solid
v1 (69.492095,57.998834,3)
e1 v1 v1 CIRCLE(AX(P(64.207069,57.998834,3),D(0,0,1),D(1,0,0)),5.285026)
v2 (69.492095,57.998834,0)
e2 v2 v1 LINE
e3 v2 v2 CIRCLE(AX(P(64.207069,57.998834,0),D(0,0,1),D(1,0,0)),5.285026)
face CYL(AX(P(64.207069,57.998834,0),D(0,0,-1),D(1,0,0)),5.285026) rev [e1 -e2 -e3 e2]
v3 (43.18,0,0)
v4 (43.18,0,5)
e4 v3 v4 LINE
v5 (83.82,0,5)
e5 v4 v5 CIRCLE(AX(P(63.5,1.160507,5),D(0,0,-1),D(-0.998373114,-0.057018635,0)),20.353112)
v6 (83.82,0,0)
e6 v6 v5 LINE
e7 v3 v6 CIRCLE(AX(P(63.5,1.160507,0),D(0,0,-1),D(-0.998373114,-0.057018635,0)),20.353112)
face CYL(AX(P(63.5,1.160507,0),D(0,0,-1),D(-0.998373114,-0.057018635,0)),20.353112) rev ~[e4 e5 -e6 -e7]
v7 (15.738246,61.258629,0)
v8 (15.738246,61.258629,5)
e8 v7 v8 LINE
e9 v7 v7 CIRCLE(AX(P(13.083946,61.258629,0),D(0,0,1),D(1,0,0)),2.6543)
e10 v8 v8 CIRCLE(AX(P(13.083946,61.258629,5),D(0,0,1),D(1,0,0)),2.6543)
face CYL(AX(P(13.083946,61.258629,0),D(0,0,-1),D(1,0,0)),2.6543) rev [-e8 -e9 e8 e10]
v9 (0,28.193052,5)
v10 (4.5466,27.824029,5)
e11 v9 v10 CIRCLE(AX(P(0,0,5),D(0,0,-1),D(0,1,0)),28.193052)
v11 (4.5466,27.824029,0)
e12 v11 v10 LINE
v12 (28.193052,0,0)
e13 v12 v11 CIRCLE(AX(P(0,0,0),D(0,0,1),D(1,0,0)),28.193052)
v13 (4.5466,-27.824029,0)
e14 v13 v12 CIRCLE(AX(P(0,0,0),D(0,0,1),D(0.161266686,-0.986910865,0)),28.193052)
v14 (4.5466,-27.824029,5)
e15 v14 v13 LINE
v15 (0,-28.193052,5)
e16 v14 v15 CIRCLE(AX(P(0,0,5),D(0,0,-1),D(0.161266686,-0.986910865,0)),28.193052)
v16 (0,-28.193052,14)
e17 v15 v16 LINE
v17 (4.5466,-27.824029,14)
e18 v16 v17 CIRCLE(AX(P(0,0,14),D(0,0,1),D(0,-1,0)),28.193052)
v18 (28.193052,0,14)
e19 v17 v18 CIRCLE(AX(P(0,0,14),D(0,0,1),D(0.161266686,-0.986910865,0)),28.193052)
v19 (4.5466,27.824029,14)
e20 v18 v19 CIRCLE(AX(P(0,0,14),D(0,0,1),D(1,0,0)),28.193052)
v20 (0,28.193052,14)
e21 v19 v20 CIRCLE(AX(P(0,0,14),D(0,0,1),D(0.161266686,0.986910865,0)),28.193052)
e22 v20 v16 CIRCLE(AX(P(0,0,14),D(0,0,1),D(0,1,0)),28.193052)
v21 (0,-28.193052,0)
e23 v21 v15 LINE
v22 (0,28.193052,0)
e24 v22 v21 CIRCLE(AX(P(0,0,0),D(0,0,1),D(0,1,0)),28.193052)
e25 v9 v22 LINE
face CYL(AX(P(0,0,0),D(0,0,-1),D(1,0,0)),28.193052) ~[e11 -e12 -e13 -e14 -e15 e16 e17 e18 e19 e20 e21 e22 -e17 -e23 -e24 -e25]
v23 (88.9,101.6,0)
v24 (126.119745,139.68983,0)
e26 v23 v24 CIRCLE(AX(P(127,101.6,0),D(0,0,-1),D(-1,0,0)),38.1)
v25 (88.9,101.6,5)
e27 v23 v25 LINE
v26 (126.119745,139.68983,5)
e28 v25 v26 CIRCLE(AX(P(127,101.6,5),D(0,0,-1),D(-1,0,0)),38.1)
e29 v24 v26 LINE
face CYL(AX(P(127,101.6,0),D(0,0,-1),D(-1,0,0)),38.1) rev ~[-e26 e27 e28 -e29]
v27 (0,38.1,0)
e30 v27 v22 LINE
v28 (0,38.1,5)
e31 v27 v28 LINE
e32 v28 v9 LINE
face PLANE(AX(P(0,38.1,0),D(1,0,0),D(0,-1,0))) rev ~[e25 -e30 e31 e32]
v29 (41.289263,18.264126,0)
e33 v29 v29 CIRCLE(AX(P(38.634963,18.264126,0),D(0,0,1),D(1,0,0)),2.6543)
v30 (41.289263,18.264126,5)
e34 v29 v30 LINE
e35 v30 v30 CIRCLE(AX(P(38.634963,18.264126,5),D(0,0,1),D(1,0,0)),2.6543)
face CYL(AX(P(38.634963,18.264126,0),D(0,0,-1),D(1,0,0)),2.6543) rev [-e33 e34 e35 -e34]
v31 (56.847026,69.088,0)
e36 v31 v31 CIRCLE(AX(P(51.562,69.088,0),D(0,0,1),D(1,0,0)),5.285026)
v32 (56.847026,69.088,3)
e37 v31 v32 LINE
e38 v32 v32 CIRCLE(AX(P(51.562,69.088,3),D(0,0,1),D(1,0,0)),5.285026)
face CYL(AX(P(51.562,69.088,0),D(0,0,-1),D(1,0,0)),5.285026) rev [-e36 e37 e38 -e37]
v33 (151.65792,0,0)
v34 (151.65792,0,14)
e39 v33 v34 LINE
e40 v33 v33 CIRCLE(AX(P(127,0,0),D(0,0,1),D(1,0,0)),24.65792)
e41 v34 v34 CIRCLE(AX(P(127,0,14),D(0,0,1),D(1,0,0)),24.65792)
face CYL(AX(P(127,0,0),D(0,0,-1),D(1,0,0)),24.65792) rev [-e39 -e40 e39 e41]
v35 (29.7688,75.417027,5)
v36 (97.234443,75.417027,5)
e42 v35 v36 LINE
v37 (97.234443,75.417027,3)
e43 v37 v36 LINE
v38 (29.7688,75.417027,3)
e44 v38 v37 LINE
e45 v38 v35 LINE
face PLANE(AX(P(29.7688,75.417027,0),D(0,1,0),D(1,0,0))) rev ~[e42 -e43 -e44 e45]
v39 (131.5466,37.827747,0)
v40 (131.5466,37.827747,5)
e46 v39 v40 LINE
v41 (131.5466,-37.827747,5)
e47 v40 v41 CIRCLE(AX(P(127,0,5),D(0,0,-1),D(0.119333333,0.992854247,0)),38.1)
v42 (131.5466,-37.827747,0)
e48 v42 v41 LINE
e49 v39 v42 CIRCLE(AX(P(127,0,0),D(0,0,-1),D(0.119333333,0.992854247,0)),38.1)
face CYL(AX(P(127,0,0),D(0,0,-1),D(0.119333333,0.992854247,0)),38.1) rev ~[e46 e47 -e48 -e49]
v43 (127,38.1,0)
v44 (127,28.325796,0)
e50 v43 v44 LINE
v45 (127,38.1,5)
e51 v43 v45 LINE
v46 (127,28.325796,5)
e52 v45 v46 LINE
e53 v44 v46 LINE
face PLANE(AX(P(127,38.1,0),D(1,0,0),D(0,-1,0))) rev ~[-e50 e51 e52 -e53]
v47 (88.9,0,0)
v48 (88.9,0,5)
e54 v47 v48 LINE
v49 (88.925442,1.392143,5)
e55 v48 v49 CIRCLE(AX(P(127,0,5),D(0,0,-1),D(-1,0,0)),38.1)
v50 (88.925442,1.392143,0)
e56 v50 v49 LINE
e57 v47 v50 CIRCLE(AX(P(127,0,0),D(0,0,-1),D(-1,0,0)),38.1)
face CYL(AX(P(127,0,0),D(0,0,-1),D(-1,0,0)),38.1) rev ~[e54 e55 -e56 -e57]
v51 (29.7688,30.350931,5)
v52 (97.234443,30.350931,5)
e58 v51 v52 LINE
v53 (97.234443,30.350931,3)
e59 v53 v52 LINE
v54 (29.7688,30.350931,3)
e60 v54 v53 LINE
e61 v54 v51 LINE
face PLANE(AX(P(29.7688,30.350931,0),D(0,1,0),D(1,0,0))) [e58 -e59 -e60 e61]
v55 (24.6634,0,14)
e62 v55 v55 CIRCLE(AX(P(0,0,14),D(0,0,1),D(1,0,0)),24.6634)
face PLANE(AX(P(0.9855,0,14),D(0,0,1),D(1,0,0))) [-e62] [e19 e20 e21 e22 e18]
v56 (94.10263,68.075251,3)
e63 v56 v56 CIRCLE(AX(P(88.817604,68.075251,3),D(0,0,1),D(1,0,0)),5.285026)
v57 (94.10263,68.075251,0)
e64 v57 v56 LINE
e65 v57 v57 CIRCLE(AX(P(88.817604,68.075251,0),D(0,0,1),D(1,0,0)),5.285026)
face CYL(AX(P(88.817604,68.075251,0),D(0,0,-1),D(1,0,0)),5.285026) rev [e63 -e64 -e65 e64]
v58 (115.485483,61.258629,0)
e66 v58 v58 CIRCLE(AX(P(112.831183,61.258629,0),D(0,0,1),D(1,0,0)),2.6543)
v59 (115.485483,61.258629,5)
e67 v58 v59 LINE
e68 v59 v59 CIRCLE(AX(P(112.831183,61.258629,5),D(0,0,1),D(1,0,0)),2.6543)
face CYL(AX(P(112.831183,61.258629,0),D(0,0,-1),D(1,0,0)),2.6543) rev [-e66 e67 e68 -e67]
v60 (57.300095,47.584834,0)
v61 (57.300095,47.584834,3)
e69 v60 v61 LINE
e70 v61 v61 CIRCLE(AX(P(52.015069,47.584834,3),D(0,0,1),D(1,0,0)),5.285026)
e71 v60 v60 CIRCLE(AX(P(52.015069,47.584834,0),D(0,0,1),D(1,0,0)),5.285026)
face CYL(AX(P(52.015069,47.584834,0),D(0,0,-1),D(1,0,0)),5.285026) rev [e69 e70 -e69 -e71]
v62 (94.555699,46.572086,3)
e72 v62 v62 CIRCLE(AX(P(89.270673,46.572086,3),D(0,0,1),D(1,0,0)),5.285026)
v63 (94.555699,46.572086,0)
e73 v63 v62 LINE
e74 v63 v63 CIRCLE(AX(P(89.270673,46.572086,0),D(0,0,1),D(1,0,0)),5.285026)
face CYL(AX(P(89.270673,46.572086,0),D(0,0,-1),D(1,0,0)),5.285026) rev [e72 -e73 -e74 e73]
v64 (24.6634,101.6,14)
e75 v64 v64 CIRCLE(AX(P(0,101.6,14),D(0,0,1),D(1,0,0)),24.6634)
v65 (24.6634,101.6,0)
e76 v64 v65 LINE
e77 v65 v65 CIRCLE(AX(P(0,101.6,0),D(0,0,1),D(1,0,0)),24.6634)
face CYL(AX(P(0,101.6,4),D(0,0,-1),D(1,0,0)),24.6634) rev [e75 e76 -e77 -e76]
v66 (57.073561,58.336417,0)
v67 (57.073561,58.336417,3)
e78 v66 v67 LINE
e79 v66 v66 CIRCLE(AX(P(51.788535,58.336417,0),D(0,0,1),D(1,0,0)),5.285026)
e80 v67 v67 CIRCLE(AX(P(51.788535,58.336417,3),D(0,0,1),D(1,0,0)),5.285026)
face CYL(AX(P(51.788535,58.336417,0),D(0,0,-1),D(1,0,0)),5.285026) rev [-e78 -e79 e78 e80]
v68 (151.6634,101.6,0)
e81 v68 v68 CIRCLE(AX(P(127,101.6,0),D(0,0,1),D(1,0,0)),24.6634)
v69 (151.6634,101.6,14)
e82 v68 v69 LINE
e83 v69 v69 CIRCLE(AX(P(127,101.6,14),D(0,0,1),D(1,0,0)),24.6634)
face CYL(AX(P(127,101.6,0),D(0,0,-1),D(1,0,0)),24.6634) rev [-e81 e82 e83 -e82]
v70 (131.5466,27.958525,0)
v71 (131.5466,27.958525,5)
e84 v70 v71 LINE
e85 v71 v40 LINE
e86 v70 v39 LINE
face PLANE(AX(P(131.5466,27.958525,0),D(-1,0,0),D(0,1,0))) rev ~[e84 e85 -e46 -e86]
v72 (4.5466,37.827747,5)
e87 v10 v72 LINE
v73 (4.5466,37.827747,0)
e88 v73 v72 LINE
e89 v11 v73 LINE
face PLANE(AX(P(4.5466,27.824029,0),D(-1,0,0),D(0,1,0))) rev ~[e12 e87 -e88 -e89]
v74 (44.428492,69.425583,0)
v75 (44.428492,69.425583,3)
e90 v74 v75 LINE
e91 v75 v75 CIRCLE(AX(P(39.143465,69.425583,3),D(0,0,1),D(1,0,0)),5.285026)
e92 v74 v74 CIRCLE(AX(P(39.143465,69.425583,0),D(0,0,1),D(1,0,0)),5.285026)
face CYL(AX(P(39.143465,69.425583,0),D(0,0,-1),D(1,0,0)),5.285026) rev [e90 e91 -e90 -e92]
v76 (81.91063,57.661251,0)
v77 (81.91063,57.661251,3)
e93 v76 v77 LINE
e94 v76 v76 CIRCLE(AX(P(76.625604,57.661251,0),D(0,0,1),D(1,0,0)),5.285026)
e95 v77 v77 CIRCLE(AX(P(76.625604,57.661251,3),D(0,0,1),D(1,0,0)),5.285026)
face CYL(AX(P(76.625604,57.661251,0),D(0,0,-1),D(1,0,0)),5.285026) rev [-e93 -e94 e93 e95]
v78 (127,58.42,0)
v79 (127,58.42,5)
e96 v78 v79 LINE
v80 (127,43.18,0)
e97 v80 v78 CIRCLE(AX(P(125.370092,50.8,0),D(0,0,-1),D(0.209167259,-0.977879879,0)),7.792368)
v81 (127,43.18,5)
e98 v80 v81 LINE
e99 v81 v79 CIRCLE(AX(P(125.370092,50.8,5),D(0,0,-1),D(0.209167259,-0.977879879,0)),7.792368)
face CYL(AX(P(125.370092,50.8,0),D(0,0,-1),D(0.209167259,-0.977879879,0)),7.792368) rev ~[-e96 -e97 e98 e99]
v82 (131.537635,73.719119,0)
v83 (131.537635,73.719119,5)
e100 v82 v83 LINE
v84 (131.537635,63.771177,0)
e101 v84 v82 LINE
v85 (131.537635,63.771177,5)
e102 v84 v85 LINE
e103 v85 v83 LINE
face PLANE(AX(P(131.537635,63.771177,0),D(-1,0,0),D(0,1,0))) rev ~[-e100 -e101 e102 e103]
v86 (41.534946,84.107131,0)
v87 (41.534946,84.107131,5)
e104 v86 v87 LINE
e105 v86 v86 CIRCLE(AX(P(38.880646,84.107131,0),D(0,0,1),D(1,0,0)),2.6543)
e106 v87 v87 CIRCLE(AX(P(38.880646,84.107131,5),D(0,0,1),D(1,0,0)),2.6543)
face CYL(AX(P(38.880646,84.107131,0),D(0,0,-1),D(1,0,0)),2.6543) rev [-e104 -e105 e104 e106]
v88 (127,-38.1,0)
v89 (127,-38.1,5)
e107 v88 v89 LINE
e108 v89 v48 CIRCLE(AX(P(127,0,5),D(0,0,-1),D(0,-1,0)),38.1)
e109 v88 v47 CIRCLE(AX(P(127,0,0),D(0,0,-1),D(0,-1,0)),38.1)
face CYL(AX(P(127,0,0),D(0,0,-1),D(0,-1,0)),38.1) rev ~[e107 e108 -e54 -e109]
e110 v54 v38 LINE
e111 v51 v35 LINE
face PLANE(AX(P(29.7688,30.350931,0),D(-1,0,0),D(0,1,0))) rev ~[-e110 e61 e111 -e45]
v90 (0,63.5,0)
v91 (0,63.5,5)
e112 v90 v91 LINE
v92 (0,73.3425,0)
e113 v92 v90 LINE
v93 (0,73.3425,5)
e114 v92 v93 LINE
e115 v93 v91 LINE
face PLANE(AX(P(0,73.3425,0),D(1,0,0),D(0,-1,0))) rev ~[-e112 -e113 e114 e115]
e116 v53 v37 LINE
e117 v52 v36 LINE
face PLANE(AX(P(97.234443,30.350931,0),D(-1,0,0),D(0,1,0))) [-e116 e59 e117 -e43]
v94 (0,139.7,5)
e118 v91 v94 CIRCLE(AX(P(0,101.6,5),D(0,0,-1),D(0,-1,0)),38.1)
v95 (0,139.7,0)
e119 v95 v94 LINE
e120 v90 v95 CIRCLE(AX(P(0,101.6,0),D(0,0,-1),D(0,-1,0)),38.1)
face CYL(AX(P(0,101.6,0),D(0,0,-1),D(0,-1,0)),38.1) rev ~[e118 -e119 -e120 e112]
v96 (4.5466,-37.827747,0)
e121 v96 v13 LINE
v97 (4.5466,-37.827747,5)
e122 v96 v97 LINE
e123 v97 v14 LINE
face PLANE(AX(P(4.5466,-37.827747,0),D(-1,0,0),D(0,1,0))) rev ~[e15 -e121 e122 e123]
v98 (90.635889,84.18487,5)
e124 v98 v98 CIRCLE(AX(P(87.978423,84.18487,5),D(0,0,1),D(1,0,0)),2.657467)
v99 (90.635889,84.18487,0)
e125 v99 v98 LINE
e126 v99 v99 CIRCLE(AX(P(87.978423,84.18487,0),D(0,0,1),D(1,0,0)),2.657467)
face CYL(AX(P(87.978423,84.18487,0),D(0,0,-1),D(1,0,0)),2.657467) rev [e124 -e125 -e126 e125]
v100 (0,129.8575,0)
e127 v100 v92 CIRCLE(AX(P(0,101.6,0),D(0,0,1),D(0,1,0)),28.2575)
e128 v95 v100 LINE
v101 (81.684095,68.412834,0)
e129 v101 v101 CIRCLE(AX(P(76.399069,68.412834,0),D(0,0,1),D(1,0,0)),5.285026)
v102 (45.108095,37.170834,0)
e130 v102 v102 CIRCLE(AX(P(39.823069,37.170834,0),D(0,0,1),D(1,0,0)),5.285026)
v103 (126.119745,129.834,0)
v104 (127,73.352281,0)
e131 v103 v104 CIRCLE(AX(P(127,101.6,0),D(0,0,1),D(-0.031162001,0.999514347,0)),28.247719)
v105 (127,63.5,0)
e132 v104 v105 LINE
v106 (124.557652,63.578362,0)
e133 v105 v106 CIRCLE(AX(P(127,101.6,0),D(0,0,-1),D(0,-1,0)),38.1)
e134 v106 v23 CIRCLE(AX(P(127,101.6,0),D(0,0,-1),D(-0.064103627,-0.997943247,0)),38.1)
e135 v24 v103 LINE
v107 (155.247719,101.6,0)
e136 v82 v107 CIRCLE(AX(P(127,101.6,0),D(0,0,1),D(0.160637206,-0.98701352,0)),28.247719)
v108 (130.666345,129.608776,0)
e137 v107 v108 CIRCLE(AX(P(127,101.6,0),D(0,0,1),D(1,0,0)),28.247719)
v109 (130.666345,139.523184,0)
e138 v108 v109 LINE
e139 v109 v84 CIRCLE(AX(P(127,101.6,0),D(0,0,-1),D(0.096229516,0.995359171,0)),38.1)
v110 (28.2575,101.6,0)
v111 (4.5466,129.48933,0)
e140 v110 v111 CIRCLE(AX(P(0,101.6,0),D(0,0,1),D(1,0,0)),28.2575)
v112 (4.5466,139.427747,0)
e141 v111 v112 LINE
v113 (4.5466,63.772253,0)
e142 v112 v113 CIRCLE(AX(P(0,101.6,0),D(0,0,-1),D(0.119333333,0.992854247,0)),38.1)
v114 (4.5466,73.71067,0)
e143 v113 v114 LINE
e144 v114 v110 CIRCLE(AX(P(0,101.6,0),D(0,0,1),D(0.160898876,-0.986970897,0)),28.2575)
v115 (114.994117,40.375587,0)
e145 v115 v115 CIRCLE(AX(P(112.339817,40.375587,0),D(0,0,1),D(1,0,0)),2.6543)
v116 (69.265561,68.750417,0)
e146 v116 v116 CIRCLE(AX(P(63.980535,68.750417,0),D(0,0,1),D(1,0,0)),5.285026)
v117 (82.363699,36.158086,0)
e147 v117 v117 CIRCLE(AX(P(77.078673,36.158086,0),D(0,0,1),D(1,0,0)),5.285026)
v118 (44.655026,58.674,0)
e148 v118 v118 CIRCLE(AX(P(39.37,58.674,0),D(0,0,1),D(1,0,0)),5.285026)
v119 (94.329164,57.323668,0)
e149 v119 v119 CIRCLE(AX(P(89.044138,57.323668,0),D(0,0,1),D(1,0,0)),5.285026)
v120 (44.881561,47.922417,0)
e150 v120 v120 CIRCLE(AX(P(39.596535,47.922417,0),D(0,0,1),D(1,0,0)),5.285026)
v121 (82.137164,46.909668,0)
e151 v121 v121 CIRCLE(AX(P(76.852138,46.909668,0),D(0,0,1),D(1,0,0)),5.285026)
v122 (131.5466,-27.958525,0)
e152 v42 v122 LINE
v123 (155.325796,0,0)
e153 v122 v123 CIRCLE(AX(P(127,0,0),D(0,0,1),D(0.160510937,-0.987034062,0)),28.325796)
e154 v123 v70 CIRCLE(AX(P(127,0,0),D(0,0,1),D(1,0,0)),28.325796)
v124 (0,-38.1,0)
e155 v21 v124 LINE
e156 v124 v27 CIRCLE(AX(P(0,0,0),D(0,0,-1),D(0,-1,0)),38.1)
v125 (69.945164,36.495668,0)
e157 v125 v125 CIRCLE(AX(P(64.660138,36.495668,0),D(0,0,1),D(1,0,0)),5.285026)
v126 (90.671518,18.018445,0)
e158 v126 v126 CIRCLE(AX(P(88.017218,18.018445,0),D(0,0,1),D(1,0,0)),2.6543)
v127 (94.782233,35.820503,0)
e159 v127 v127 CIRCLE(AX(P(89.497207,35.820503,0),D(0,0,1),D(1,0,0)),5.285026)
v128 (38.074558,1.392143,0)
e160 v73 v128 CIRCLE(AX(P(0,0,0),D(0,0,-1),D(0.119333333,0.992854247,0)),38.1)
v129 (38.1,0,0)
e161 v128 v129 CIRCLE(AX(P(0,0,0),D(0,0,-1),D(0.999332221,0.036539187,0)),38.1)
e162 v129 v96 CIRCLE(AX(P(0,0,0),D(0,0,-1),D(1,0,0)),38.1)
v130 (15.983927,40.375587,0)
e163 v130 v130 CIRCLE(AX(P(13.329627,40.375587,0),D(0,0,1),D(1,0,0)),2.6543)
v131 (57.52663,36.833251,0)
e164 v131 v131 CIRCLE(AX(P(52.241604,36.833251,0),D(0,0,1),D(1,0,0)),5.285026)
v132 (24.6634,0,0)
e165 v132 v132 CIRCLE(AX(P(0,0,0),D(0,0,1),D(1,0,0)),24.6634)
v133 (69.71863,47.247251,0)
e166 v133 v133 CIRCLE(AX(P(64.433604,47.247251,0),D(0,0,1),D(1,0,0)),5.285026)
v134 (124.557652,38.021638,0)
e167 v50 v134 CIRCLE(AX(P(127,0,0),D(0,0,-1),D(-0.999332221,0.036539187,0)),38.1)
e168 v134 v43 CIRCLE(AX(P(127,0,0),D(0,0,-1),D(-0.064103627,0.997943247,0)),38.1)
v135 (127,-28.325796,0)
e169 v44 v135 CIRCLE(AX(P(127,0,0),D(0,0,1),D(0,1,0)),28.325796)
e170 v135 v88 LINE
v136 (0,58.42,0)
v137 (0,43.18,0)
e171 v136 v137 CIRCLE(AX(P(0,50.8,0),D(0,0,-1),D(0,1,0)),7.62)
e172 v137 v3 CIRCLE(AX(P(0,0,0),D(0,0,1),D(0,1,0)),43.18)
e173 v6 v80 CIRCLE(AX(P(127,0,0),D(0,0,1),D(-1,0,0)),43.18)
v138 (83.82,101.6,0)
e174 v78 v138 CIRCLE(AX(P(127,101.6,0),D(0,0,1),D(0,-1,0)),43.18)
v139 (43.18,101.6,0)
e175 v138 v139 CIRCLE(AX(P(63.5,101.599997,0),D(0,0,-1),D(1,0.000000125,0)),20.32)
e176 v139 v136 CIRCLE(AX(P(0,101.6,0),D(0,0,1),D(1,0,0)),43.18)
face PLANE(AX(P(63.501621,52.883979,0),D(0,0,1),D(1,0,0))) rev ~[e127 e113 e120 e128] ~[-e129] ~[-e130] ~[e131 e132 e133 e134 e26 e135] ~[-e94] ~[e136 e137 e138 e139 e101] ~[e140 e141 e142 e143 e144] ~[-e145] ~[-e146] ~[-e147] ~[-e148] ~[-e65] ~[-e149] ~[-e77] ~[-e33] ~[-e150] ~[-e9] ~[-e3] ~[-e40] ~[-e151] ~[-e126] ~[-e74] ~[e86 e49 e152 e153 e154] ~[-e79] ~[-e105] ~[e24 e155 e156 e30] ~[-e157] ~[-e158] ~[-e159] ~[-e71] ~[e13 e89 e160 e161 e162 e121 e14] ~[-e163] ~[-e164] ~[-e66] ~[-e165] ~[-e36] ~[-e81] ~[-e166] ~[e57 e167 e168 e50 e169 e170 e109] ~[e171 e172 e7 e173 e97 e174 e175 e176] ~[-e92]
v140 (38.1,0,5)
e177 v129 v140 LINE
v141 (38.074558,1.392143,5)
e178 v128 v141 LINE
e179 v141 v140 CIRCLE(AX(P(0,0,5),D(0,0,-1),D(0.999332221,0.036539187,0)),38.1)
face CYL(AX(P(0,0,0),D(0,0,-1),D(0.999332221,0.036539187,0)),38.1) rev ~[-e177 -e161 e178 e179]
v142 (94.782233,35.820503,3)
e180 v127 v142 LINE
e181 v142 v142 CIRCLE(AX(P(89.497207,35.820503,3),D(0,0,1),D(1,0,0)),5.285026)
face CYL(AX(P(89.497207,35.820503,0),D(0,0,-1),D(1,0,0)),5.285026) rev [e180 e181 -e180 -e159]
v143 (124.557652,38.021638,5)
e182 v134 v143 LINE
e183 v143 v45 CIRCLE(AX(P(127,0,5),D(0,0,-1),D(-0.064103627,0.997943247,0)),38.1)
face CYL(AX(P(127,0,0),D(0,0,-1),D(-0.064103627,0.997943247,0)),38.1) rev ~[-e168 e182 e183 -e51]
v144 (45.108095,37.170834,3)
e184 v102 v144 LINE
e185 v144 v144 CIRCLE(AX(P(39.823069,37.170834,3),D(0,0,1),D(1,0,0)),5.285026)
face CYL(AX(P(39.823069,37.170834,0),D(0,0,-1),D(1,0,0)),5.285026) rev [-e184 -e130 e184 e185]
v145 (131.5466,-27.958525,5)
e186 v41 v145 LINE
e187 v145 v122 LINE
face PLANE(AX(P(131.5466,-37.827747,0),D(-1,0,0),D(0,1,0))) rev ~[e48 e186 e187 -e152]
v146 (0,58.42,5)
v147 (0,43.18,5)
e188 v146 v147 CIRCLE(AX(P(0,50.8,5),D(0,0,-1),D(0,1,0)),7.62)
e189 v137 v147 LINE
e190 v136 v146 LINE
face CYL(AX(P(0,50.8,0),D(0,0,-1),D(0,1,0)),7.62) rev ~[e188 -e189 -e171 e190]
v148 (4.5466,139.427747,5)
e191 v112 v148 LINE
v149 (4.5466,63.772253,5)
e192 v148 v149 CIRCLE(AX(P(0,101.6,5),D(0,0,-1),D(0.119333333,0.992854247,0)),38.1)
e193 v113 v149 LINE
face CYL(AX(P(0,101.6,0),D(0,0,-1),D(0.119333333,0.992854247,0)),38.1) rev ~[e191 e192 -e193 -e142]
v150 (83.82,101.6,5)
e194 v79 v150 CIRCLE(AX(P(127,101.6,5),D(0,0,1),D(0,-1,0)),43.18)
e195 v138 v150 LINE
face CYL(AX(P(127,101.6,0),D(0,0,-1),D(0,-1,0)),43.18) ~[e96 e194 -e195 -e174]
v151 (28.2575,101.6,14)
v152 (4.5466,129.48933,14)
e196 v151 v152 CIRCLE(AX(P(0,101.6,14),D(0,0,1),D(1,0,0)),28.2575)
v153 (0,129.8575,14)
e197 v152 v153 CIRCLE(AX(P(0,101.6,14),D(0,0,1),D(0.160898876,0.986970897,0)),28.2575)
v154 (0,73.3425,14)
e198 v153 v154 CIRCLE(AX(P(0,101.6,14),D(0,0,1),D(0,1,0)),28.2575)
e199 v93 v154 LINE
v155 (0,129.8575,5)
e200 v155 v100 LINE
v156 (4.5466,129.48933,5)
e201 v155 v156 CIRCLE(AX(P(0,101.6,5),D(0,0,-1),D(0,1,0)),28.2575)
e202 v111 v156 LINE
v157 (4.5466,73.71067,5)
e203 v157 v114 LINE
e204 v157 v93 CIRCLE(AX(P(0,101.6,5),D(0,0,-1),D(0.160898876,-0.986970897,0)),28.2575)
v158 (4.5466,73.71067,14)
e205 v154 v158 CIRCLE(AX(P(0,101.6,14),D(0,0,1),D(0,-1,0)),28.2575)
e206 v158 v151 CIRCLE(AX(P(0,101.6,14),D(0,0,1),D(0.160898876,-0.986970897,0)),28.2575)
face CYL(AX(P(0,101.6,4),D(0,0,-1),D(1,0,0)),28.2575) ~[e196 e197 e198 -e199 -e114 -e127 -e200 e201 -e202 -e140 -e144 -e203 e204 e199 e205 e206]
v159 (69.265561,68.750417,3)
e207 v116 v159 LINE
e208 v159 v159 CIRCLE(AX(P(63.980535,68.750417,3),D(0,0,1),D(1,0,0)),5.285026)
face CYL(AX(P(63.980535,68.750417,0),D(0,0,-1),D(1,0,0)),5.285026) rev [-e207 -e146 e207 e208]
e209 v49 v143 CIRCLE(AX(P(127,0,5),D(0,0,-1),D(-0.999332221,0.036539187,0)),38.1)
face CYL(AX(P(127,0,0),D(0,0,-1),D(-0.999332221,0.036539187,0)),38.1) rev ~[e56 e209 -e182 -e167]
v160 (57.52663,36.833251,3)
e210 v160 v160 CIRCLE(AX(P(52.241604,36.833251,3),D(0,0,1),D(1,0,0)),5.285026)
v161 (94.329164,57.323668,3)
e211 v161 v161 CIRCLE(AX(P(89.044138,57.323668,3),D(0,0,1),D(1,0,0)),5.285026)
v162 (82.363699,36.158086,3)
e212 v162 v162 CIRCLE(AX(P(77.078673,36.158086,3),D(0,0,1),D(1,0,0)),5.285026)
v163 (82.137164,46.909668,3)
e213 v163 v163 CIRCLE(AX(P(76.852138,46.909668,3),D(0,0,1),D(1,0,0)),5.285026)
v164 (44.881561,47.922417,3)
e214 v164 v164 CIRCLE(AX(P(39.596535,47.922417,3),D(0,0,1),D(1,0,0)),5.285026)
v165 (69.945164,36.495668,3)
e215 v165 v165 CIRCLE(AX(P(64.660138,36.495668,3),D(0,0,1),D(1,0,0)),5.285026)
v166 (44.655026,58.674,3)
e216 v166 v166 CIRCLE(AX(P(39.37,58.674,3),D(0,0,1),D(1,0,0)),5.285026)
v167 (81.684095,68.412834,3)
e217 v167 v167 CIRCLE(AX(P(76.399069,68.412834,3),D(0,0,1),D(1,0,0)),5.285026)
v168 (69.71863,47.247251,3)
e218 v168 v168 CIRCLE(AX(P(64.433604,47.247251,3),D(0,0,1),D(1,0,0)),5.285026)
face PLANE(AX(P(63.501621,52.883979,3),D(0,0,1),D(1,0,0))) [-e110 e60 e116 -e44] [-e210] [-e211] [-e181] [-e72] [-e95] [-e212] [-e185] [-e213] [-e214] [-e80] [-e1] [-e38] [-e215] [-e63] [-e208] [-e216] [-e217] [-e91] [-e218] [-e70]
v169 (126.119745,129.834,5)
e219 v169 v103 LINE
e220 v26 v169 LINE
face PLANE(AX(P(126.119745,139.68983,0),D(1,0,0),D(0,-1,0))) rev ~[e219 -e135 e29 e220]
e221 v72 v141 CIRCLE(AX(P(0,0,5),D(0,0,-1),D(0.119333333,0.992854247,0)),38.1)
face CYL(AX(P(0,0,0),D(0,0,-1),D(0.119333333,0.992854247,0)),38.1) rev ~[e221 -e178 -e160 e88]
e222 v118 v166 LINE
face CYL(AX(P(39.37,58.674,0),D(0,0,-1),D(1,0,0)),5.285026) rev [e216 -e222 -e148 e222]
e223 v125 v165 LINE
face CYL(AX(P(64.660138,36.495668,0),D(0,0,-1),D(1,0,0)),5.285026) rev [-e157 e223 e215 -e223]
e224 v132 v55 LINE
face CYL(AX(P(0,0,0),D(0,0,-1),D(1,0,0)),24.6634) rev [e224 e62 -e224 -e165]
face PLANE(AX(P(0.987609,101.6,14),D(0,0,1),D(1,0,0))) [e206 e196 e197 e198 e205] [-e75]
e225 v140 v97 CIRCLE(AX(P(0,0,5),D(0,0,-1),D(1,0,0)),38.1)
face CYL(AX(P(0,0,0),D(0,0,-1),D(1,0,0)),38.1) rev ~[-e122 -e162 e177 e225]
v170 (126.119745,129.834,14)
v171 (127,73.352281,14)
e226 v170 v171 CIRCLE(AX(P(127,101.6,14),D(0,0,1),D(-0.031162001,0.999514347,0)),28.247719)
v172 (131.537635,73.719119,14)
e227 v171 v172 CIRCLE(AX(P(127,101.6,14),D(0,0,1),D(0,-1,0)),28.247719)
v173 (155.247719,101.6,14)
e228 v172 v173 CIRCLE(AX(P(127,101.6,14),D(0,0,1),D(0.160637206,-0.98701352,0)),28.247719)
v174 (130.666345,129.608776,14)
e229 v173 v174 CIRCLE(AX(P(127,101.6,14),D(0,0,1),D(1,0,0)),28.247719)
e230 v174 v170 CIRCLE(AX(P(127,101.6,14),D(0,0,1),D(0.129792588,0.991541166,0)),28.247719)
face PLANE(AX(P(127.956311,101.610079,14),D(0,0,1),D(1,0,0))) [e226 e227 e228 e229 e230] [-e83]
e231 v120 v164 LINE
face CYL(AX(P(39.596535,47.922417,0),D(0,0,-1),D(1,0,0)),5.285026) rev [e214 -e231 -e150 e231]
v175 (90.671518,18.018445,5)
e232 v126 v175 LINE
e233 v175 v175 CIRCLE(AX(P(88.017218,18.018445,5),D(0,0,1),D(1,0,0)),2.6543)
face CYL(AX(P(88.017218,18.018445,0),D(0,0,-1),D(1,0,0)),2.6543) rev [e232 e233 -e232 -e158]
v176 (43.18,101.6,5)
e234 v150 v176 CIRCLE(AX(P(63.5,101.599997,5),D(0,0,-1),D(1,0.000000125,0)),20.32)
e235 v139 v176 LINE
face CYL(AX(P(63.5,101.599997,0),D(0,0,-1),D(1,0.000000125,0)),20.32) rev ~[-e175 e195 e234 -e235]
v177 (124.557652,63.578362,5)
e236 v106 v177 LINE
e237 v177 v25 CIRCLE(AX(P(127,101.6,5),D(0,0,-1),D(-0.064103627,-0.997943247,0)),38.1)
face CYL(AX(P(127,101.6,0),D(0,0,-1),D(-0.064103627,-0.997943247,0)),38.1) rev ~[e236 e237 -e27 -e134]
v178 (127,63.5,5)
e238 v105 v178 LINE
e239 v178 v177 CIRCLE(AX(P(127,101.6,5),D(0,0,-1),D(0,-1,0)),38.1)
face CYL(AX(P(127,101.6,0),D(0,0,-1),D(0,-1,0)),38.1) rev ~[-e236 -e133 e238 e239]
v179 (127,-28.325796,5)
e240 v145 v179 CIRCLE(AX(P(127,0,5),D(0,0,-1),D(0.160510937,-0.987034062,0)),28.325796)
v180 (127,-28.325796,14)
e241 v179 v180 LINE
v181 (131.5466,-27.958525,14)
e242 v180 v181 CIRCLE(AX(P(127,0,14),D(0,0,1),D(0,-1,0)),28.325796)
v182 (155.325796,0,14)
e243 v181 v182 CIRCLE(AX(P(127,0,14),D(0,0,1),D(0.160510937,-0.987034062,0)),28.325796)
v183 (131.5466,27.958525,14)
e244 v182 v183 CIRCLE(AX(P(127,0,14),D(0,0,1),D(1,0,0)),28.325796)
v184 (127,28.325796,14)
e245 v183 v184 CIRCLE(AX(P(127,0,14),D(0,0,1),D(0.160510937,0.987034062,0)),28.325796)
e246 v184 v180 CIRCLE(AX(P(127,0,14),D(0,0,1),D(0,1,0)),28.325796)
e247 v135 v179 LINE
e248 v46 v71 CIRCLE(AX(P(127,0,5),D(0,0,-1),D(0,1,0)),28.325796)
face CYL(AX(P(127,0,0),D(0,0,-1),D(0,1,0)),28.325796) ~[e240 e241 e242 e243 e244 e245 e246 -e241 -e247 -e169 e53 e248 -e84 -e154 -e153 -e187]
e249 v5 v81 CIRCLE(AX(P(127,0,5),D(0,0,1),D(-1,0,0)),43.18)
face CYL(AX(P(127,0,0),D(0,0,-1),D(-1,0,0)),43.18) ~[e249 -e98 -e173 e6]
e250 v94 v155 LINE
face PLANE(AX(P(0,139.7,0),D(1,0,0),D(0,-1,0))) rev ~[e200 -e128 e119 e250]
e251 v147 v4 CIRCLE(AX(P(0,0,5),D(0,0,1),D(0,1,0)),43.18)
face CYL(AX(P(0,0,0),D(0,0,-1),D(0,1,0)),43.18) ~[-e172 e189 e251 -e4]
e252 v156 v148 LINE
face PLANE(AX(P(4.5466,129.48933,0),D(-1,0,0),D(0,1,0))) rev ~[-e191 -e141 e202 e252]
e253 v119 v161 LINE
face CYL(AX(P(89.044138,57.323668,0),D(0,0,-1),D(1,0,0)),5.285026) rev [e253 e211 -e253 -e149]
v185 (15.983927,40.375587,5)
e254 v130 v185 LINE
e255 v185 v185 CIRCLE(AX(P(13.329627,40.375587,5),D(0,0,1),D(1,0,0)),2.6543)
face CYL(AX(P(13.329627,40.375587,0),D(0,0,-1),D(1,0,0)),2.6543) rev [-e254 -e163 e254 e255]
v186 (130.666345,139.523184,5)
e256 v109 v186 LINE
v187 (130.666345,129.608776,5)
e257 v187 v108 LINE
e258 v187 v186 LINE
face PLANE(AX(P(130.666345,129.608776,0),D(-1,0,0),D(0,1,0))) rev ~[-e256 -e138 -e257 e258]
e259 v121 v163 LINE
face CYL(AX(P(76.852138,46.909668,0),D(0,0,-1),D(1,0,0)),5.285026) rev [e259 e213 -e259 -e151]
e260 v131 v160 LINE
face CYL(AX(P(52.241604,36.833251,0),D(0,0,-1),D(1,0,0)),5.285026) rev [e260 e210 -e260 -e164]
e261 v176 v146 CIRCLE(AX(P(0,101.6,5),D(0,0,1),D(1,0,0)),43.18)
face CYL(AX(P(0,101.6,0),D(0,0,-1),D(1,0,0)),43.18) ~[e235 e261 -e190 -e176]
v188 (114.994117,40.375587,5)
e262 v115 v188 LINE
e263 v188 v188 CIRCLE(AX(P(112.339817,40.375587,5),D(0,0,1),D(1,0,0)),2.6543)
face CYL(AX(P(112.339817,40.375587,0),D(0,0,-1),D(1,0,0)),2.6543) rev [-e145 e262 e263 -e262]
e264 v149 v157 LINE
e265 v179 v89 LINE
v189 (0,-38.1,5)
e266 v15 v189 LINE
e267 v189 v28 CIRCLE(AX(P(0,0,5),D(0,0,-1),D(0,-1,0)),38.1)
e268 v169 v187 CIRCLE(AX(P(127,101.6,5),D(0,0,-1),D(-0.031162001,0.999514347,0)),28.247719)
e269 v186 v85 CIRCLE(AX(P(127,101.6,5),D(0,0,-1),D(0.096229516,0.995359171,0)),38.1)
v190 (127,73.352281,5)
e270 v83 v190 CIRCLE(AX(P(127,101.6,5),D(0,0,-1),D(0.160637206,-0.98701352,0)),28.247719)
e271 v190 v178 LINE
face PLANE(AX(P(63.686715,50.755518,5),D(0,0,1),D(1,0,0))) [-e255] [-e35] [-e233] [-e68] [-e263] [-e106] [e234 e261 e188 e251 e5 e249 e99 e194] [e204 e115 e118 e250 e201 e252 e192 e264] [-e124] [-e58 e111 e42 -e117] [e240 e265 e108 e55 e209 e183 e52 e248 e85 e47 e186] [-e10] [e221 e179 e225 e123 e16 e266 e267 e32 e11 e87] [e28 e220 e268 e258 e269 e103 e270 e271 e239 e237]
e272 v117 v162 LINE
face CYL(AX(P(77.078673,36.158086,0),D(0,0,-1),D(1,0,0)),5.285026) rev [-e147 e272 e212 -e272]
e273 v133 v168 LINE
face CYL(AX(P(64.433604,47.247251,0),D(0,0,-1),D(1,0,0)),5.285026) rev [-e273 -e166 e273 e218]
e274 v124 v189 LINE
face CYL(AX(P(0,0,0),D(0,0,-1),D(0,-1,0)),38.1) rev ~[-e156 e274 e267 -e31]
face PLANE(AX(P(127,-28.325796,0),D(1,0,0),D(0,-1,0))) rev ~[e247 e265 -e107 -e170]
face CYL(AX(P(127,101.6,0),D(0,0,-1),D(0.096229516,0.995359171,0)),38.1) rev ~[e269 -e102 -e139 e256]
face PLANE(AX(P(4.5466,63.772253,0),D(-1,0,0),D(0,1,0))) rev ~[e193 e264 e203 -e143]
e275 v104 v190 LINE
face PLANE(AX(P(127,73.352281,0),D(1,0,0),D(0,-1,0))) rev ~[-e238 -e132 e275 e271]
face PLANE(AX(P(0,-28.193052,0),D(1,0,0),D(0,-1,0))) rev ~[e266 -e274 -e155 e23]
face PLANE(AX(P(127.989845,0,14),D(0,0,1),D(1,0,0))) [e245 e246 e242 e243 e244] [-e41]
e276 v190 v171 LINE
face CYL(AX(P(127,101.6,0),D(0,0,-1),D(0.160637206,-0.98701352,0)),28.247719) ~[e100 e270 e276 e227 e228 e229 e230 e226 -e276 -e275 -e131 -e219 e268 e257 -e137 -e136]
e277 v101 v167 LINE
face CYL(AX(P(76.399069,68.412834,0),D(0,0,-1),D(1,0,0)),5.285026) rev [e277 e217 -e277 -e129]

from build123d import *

# Parameters (mm, degrees)
F0_R     = 2.6543
F0_W     = 67.4656428301
F0_H     = 45.0660958886
F0_R_2   = 2.6574668283
F1_DEPTH = 5
F0_R_3   = 24.6634
F0_R_4   = 24.6579201523
F2_DEPTH = 4
F3_DEPTH = 10
F0_R_5   = 5.2850261196
F4_DEPTH = 3


# Not quite as in the source:
# - ends of sketch curves that miss each other by under 0.0002 mm in the source are joined


with BuildPart() as f1:
    # F0 (on Top) → F1 (new body)
    with BuildSketch(Plane.XY):
        with BuildLine():
            ThreePointArc((127, 43.18), (117.5777235877, 50.8), (127, 58.42))
            ThreePointArc((127, 58.42), (157.5328708116, 132.1328708116), (83.82, 101.6))
            ThreePointArc((83.82, 101.6), (63.4999991392, 81.2799974683), (43.18, 101.6))
            ThreePointArc((43.18, 101.6), (-30.5328708116, 132.1328708116), (0, 58.42))
            ThreePointArc((0, 58.42), (7.62, 50.8), (0, 43.18))
            ThreePointArc((0, 43.18), (-30.5328708116, -30.5328708116), (43.18, 0))
            ThreePointArc((43.18, 0), (63.5, 21.5136188611), (83.82, 0))
            ThreePointArc((83.82, 0), (157.5328708116, -30.5328708116), (127, 43.18))
        make_face()
        with BuildLine():
            ThreePointArc((131.5376346572, 63.7711767072), (129.2728652121, 63.5678546), (127, 63.5))
            ThreePointArc((127, 63.5), (125.778197507, 63.5195956079), (124.55765181, 63.5783622746))
            ThreePointArc((124.55765181, 63.5783622746), (112.565928289, 50.8), (124.55765181, 38.0216377254))
            ThreePointArc((124.55765181, 38.0216377254), (125.778197507, 38.0804043921), (127, 38.1))
            ThreePointArc((127, 38.1), (129.277372025, 38.0318757973), (131.5466, 37.8277468063))
            ThreePointArc((131.5466, 37.8277468063), (165.1, 0), (131.5466, -37.8277468063))
            ThreePointArc((131.5466, -37.8277468063), (129.277372025, -38.0318757973), (127, -38.1))
            ThreePointArc((127, -38.1), (100.0592316368, -26.9407683632), (88.9, 0))
            ThreePointArc((88.9, 0), (88.9063611266, 0.6961877498), (88.9254423823, 1.3921430304))
            ThreePointArc((88.9254423823, 1.3921430304), (63.5, 26.5870041852), (38.0745576177, 1.3921430304))
            ThreePointArc((38.0745576177, 1.3921430304), (38.0936388734, 0.6961877498), (38.1, 0))
            ThreePointArc((38.1, 0), (28.5029424797, -25.2822520753), (4.5466, -37.8277468063))
            ThreePointArc((4.5466, -37.8277468063), (2.277372025, -38.0318757973), (0, -38.1))
            ThreePointArc((0, -38.1), (-38.1, 0), (0, 38.1))
            ThreePointArc((0, 38.1), (12.7, 50.8), (0, 63.5))
            ThreePointArc((0, 63.5), (-38.1, 101.6), (0, 139.7))
            ThreePointArc((0, 139.7), (2.277372025, 139.6318757973), (4.5466, 139.4277468063))
            ThreePointArc((4.5466, 139.4277468063), (28.5029424797, 126.8822520753), (38.1, 101.6))
            ThreePointArc((38.1, 101.6), (63.5, 76.1999974683), (88.9, 101.6))
            ThreePointArc((88.9, 101.6), (99.7497914455, 128.2277324182), (126.1197445529, 139.6898300121))
            ThreePointArc((126.1197445529, 139.6898300121), (128.3955342395, 139.6744334716), (130.6663445529, 139.5231844341))
            ThreePointArc((130.6663445529, 139.5231844341), (165.097480066, 102.0381924437), (131.5376346572, 63.7711767072))
        make_face(mode=Mode.SUBTRACT)
        with BuildLine():
            ThreePointArc((0, 63.5), (2.277372025, 63.5681242027), (4.5466, 63.7722531937))
            Line((4.5466, 63.7722531937), (4.5466, 73.7106698774))
            ThreePointArc((4.5466, 73.7106698774), (2.2807411415, 73.4346928635), (0, 73.3425))
            Line((0, 73.3425), (0, 63.5))
        make_face()
        with BuildLine():
            Line((4.5466, 129.4893301226), (4.5466, 139.4277468063))
            ThreePointArc((4.5466, 139.4277468063), (2.277372025, 139.6318757973), (0, 139.7))
            Line((0, 139.7), (0, 129.8575))
            ThreePointArc((0, 129.8575), (2.2807411415, 129.7653071365), (4.5466, 129.4893301226))
        make_face()
        with BuildLine():
            Line((4.5466, 27.8240290125), (4.5466, 37.8277468063))
            ThreePointArc((4.5466, 37.8277468063), (2.277372025, 38.0318757973), (0, 38.1))
            Line((0, 38.1), (0, 28.1930516626))
            ThreePointArc((0, 28.1930516626), (2.2807755959, 28.1006445607), (4.5466, 27.8240290125))
        make_face()
        with BuildLine():
            ThreePointArc((0, -38.1), (2.277372025, -38.0318757973), (4.5466, -37.8277468063))
            Line((4.5466, -37.8277468063), (4.5466, -27.8240290125))
            ThreePointArc((4.5466, -27.8240290125), (2.2807755959, -28.1006445607), (0, -28.1930516626))
            Line((0, -28.1930516626), (0, -38.1))
        make_face()
        with BuildLine():
            ThreePointArc((124.55765181, 38.0216377254), (112.565928289, 50.8), (124.55765181, 63.5783622746))
            ThreePointArc((124.55765181, 63.5783622746), (99.2091429959, 75.5370326521), (88.9, 101.6))
            ThreePointArc((88.9, 101.6), (63.5, 76.1999974683), (38.1, 101.6))
            ThreePointArc((38.1, 101.6), (28.5029424797, 76.3177479247), (4.5466, 63.7722531937))
            ThreePointArc((4.5466, 63.7722531937), (2.277372025, 63.5681242027), (0, 63.5))
            ThreePointArc((0, 63.5), (12.7, 50.8), (0, 38.1))
            ThreePointArc((0, 38.1), (2.277372025, 38.0318757973), (4.5466, 37.8277468063))
            ThreePointArc((4.5466, 37.8277468063), (28.0362100648, 25.7988551142), (38.0745576177, 1.3921430304))
            ThreePointArc((38.0745576177, 1.3921430304), (63.5, 26.5870041852), (88.9254423823, 1.3921430304))
            ThreePointArc((88.9254423823, 1.3921430304), (99.6900222545, 26.566428355), (124.55765181, 38.0216377254))
        make_face()
        with Locations((38.6349633336, 18.2641260326)):
            Circle(F0_R, mode=Mode.SUBTRACT)
        with Locations((13.3296269923, 40.3755865991)):
            Circle(F0_R, mode=Mode.SUBTRACT)
        with Locations((88.0172178149, 18.018445)):
            Circle(F0_R, mode=Mode.SUBTRACT)
        with Locations((112.3398169875, 40.3755865991)):
            Circle(F0_R, mode=Mode.SUBTRACT)
        with Locations((13.0839459598, 61.2586289644)):
            Circle(F0_R, mode=Mode.SUBTRACT)
        with Locations((38.8806462288, 84.1071307659)):
            Circle(F0_R, mode=Mode.SUBTRACT)
        with Locations((63.501621415, 52.8839789331)):
            Rectangle(F0_W, F0_H, mode=Mode.SUBTRACT)
        with Locations((112.8311827779, 61.2586289644)):
            Circle(F0_R, mode=Mode.SUBTRACT)
        with Locations((87.9784226418, 84.1848701239)):
            Circle(F0_R_2, mode=Mode.SUBTRACT)
        with BuildLine():
            Line((130.6663445529, 129.6087763106), (130.6663445529, 139.5231844341))
            ThreePointArc((130.6663445529, 139.5231844341), (128.3955342395, 139.6744334716), (126.1197445529, 139.6898300121))
            Line((126.1197445529, 139.6898300121), (126.1197445529, 129.8340004808))
            ThreePointArc((126.1197445529, 129.8340004808), (128.3975888552, 129.8131242189), (130.6663445529, 129.6087763106))
        make_face()
        with BuildLine():
            Line((127, 73.3522809275), (127, 63.5))
            ThreePointArc((127, 63.5), (129.2728652121, 63.5678546), (131.5376346572, 63.7711767072))
            Line((131.5376346572, 63.7711767072), (131.5376346572, 73.7191193733))
            ThreePointArc((131.5376346572, 73.7191193733), (129.2762193835, 73.4441398974), (127, 73.3522809275))
        make_face()
        with BuildLine():
            ThreePointArc((131.5466, 37.8277468063), (129.277372025, 38.0318757973), (127, 38.1))
            Line((127, 38.1), (127, 28.3257955932))
            ThreePointArc((127, 28.3257955932), (129.2807048906, 28.2338286668), (131.5466, 27.958525076))
            Line((131.5466, 27.958525076), (131.5466, 37.8277468063))
        make_face()
        with BuildLine():
            ThreePointArc((127, -38.1), (129.277372025, -38.0318757973), (131.5466, -37.8277468063))
            Line((131.5466, -37.8277468063), (131.5466, -27.958525076))
            ThreePointArc((131.5466, -27.958525076), (129.2807048906, -28.2338286668), (127, -28.3257955932))
            Line((127, -28.3257955932), (127, -38.1))
        make_face()
    extrude(amount=F1_DEPTH)

    # F0 (on Top) → F2 (join)
    with BuildSketch(Plane.XY):
        with BuildLine():
            ThreePointArc((28.1930516626, 0), (21.4829082149, 18.2574044344), (4.5466, 27.8240290125))
            ThreePointArc((4.5466, 27.8240290125), (2.2807755959, 28.1006445607), (0, 28.1930516626))
            ThreePointArc((0, 28.1930516626), (-28.1930516626, 0), (0, -28.1930516626))
            ThreePointArc((0, -28.1930516626), (2.2807755959, -28.1006445607), (4.5466, -27.8240290125))
            ThreePointArc((4.5466, -27.8240290125), (21.4829082149, -18.2574044344), (28.1930516626, 0))
        make_face()
        Circle(F0_R_3, mode=Mode.SUBTRACT)
        with BuildLine():
            ThreePointArc((28.2575, 101.6), (21.5286071977, 119.9031521431), (4.5466, 129.4893301226))
            ThreePointArc((4.5466, 129.4893301226), (2.2807411415, 129.7653071365), (0, 129.8575))
            ThreePointArc((0, 129.8575), (-28.2575, 101.6), (0, 73.3425))
            ThreePointArc((0, 73.3425), (2.2807411415, 73.4346928635), (4.5466, 73.7106698774))
            ThreePointArc((4.5466, 73.7106698774), (21.5286071977, 83.2968478569), (28.2575, 101.6))
        make_face()
        with Locations((0, 101.6)):
            Circle(F0_R_3, mode=Mode.SUBTRACT)
        with BuildLine():
            ThreePointArc((126.1197445529, 129.8340004808), (98.7557107836, 101.1598188294), (127, 73.3522809275))
            ThreePointArc((127, 73.3522809275), (129.2762193835, 73.4441398974), (131.5376346572, 73.7191193733))
            ThreePointArc((131.5376346572, 73.7191193733), (148.5187297703, 83.3003305528), (155.2477190725, 101.6))
            ThreePointArc((155.2477190725, 101.6), (148.2308679021, 120.2328709791), (130.6663445529, 129.6087763106))
            ThreePointArc((130.6663445529, 129.6087763106), (128.3975888552, 129.8131242189), (126.1197445529, 129.8340004808))
        make_face()
        with Locations((127, 101.6)):
            Circle(F0_R_3, mode=Mode.SUBTRACT)
        with BuildLine():
            ThreePointArc((131.5466, 27.958525076), (129.2807048906, 28.2338286668), (127, 28.3257955932))
            ThreePointArc((127, 28.3257955932), (98.6742044068, 0), (127, -28.3257955932))
            ThreePointArc((127, -28.3257955932), (129.2807048906, -28.2338286668), (131.5466, -27.958525076))
            ThreePointArc((131.5466, -27.958525076), (148.5770336032, -18.3516298151), (155.3257955932, 0))
            ThreePointArc((155.3257955932, 0), (148.5770336032, 18.3516298151), (131.5466, 27.958525076))
        make_face()
        with Locations((127, 0)):
            Circle(F0_R_4, mode=Mode.SUBTRACT)
    extrude(amount=F2_DEPTH)

    # F3 (add): faces of the model
    f3_faces = [f1.faces().sort_by_distance(p)[0] for p in [
        (2.2162320404, 128.9686719497, 4),
        (129.2118381771, 74.2405078817, 4),
        (129.2161968149, 27.4352553985, 4),
        (27.3956317421, 0, 4),
    ]]
    extrude(f3_faces, amount=F3_DEPTH)

    # F0 (on Top) → F4 (join)
    with BuildSketch(Plane.XY):
        with Locations((63.501621415, 52.8839789331)):
            Rectangle(F0_W, F0_H)
        with Locations((39.8230690813, 37.1708342285)):
            Circle(F0_R_5, mode=Mode.SUBTRACT)
        with Locations((52.241603622, 36.8332513428)):
            Circle(F0_R_5, mode=Mode.SUBTRACT)
        with Locations((39.5965345407, 47.9224171143)):
            Circle(F0_R_5, mode=Mode.SUBTRACT)
        with Locations((52.0150690813, 47.5848342285)):
            Circle(F0_R_5, mode=Mode.SUBTRACT)
        with Locations((64.6601381626, 36.495668457)):
            Circle(F0_R_5, mode=Mode.SUBTRACT)
        with Locations((77.0786727033, 36.1580855713)):
            Circle(F0_R_5, mode=Mode.SUBTRACT)
        with Locations((89.4972072439, 35.8205026855)):
            Circle(F0_R_5, mode=Mode.SUBTRACT)
        with Locations((64.433603622, 47.2472513428)):
            Circle(F0_R_5, mode=Mode.SUBTRACT)
        with Locations((76.8521381626, 46.909668457)):
            Circle(F0_R_5, mode=Mode.SUBTRACT)
        with Locations((89.2706727033, 46.5720855713)):
            Circle(F0_R_5, mode=Mode.SUBTRACT)
        with Locations((39.37, 58.674)):
            Circle(F0_R_5, mode=Mode.SUBTRACT)
        with Locations((51.7885345407, 58.3364171143)):
            Circle(F0_R_5, mode=Mode.SUBTRACT)
        with Locations((39.1434654593, 69.4255828857)):
            Circle(F0_R_5, mode=Mode.SUBTRACT)
        with Locations((51.562, 69.088)):
            Circle(F0_R_5, mode=Mode.SUBTRACT)
        with Locations((64.2070690813, 57.9988342285)):
            Circle(F0_R_5, mode=Mode.SUBTRACT)
        with Locations((76.625603622, 57.6612513428)):
            Circle(F0_R_5, mode=Mode.SUBTRACT)
        with Locations((89.0441381626, 57.323668457)):
            Circle(F0_R_5, mode=Mode.SUBTRACT)
        with Locations((76.3990690813, 68.4128342285)):
            Circle(F0_R_5, mode=Mode.SUBTRACT)
        with Locations((63.9805345407, 68.7504171143)):
            Circle(F0_R_5, mode=Mode.SUBTRACT)
        with Locations((88.817603622, 68.0752513428)):
            Circle(F0_R_5, mode=Mode.SUBTRACT)
    extrude(amount=F4_DEPTH)


solid = f1.part
